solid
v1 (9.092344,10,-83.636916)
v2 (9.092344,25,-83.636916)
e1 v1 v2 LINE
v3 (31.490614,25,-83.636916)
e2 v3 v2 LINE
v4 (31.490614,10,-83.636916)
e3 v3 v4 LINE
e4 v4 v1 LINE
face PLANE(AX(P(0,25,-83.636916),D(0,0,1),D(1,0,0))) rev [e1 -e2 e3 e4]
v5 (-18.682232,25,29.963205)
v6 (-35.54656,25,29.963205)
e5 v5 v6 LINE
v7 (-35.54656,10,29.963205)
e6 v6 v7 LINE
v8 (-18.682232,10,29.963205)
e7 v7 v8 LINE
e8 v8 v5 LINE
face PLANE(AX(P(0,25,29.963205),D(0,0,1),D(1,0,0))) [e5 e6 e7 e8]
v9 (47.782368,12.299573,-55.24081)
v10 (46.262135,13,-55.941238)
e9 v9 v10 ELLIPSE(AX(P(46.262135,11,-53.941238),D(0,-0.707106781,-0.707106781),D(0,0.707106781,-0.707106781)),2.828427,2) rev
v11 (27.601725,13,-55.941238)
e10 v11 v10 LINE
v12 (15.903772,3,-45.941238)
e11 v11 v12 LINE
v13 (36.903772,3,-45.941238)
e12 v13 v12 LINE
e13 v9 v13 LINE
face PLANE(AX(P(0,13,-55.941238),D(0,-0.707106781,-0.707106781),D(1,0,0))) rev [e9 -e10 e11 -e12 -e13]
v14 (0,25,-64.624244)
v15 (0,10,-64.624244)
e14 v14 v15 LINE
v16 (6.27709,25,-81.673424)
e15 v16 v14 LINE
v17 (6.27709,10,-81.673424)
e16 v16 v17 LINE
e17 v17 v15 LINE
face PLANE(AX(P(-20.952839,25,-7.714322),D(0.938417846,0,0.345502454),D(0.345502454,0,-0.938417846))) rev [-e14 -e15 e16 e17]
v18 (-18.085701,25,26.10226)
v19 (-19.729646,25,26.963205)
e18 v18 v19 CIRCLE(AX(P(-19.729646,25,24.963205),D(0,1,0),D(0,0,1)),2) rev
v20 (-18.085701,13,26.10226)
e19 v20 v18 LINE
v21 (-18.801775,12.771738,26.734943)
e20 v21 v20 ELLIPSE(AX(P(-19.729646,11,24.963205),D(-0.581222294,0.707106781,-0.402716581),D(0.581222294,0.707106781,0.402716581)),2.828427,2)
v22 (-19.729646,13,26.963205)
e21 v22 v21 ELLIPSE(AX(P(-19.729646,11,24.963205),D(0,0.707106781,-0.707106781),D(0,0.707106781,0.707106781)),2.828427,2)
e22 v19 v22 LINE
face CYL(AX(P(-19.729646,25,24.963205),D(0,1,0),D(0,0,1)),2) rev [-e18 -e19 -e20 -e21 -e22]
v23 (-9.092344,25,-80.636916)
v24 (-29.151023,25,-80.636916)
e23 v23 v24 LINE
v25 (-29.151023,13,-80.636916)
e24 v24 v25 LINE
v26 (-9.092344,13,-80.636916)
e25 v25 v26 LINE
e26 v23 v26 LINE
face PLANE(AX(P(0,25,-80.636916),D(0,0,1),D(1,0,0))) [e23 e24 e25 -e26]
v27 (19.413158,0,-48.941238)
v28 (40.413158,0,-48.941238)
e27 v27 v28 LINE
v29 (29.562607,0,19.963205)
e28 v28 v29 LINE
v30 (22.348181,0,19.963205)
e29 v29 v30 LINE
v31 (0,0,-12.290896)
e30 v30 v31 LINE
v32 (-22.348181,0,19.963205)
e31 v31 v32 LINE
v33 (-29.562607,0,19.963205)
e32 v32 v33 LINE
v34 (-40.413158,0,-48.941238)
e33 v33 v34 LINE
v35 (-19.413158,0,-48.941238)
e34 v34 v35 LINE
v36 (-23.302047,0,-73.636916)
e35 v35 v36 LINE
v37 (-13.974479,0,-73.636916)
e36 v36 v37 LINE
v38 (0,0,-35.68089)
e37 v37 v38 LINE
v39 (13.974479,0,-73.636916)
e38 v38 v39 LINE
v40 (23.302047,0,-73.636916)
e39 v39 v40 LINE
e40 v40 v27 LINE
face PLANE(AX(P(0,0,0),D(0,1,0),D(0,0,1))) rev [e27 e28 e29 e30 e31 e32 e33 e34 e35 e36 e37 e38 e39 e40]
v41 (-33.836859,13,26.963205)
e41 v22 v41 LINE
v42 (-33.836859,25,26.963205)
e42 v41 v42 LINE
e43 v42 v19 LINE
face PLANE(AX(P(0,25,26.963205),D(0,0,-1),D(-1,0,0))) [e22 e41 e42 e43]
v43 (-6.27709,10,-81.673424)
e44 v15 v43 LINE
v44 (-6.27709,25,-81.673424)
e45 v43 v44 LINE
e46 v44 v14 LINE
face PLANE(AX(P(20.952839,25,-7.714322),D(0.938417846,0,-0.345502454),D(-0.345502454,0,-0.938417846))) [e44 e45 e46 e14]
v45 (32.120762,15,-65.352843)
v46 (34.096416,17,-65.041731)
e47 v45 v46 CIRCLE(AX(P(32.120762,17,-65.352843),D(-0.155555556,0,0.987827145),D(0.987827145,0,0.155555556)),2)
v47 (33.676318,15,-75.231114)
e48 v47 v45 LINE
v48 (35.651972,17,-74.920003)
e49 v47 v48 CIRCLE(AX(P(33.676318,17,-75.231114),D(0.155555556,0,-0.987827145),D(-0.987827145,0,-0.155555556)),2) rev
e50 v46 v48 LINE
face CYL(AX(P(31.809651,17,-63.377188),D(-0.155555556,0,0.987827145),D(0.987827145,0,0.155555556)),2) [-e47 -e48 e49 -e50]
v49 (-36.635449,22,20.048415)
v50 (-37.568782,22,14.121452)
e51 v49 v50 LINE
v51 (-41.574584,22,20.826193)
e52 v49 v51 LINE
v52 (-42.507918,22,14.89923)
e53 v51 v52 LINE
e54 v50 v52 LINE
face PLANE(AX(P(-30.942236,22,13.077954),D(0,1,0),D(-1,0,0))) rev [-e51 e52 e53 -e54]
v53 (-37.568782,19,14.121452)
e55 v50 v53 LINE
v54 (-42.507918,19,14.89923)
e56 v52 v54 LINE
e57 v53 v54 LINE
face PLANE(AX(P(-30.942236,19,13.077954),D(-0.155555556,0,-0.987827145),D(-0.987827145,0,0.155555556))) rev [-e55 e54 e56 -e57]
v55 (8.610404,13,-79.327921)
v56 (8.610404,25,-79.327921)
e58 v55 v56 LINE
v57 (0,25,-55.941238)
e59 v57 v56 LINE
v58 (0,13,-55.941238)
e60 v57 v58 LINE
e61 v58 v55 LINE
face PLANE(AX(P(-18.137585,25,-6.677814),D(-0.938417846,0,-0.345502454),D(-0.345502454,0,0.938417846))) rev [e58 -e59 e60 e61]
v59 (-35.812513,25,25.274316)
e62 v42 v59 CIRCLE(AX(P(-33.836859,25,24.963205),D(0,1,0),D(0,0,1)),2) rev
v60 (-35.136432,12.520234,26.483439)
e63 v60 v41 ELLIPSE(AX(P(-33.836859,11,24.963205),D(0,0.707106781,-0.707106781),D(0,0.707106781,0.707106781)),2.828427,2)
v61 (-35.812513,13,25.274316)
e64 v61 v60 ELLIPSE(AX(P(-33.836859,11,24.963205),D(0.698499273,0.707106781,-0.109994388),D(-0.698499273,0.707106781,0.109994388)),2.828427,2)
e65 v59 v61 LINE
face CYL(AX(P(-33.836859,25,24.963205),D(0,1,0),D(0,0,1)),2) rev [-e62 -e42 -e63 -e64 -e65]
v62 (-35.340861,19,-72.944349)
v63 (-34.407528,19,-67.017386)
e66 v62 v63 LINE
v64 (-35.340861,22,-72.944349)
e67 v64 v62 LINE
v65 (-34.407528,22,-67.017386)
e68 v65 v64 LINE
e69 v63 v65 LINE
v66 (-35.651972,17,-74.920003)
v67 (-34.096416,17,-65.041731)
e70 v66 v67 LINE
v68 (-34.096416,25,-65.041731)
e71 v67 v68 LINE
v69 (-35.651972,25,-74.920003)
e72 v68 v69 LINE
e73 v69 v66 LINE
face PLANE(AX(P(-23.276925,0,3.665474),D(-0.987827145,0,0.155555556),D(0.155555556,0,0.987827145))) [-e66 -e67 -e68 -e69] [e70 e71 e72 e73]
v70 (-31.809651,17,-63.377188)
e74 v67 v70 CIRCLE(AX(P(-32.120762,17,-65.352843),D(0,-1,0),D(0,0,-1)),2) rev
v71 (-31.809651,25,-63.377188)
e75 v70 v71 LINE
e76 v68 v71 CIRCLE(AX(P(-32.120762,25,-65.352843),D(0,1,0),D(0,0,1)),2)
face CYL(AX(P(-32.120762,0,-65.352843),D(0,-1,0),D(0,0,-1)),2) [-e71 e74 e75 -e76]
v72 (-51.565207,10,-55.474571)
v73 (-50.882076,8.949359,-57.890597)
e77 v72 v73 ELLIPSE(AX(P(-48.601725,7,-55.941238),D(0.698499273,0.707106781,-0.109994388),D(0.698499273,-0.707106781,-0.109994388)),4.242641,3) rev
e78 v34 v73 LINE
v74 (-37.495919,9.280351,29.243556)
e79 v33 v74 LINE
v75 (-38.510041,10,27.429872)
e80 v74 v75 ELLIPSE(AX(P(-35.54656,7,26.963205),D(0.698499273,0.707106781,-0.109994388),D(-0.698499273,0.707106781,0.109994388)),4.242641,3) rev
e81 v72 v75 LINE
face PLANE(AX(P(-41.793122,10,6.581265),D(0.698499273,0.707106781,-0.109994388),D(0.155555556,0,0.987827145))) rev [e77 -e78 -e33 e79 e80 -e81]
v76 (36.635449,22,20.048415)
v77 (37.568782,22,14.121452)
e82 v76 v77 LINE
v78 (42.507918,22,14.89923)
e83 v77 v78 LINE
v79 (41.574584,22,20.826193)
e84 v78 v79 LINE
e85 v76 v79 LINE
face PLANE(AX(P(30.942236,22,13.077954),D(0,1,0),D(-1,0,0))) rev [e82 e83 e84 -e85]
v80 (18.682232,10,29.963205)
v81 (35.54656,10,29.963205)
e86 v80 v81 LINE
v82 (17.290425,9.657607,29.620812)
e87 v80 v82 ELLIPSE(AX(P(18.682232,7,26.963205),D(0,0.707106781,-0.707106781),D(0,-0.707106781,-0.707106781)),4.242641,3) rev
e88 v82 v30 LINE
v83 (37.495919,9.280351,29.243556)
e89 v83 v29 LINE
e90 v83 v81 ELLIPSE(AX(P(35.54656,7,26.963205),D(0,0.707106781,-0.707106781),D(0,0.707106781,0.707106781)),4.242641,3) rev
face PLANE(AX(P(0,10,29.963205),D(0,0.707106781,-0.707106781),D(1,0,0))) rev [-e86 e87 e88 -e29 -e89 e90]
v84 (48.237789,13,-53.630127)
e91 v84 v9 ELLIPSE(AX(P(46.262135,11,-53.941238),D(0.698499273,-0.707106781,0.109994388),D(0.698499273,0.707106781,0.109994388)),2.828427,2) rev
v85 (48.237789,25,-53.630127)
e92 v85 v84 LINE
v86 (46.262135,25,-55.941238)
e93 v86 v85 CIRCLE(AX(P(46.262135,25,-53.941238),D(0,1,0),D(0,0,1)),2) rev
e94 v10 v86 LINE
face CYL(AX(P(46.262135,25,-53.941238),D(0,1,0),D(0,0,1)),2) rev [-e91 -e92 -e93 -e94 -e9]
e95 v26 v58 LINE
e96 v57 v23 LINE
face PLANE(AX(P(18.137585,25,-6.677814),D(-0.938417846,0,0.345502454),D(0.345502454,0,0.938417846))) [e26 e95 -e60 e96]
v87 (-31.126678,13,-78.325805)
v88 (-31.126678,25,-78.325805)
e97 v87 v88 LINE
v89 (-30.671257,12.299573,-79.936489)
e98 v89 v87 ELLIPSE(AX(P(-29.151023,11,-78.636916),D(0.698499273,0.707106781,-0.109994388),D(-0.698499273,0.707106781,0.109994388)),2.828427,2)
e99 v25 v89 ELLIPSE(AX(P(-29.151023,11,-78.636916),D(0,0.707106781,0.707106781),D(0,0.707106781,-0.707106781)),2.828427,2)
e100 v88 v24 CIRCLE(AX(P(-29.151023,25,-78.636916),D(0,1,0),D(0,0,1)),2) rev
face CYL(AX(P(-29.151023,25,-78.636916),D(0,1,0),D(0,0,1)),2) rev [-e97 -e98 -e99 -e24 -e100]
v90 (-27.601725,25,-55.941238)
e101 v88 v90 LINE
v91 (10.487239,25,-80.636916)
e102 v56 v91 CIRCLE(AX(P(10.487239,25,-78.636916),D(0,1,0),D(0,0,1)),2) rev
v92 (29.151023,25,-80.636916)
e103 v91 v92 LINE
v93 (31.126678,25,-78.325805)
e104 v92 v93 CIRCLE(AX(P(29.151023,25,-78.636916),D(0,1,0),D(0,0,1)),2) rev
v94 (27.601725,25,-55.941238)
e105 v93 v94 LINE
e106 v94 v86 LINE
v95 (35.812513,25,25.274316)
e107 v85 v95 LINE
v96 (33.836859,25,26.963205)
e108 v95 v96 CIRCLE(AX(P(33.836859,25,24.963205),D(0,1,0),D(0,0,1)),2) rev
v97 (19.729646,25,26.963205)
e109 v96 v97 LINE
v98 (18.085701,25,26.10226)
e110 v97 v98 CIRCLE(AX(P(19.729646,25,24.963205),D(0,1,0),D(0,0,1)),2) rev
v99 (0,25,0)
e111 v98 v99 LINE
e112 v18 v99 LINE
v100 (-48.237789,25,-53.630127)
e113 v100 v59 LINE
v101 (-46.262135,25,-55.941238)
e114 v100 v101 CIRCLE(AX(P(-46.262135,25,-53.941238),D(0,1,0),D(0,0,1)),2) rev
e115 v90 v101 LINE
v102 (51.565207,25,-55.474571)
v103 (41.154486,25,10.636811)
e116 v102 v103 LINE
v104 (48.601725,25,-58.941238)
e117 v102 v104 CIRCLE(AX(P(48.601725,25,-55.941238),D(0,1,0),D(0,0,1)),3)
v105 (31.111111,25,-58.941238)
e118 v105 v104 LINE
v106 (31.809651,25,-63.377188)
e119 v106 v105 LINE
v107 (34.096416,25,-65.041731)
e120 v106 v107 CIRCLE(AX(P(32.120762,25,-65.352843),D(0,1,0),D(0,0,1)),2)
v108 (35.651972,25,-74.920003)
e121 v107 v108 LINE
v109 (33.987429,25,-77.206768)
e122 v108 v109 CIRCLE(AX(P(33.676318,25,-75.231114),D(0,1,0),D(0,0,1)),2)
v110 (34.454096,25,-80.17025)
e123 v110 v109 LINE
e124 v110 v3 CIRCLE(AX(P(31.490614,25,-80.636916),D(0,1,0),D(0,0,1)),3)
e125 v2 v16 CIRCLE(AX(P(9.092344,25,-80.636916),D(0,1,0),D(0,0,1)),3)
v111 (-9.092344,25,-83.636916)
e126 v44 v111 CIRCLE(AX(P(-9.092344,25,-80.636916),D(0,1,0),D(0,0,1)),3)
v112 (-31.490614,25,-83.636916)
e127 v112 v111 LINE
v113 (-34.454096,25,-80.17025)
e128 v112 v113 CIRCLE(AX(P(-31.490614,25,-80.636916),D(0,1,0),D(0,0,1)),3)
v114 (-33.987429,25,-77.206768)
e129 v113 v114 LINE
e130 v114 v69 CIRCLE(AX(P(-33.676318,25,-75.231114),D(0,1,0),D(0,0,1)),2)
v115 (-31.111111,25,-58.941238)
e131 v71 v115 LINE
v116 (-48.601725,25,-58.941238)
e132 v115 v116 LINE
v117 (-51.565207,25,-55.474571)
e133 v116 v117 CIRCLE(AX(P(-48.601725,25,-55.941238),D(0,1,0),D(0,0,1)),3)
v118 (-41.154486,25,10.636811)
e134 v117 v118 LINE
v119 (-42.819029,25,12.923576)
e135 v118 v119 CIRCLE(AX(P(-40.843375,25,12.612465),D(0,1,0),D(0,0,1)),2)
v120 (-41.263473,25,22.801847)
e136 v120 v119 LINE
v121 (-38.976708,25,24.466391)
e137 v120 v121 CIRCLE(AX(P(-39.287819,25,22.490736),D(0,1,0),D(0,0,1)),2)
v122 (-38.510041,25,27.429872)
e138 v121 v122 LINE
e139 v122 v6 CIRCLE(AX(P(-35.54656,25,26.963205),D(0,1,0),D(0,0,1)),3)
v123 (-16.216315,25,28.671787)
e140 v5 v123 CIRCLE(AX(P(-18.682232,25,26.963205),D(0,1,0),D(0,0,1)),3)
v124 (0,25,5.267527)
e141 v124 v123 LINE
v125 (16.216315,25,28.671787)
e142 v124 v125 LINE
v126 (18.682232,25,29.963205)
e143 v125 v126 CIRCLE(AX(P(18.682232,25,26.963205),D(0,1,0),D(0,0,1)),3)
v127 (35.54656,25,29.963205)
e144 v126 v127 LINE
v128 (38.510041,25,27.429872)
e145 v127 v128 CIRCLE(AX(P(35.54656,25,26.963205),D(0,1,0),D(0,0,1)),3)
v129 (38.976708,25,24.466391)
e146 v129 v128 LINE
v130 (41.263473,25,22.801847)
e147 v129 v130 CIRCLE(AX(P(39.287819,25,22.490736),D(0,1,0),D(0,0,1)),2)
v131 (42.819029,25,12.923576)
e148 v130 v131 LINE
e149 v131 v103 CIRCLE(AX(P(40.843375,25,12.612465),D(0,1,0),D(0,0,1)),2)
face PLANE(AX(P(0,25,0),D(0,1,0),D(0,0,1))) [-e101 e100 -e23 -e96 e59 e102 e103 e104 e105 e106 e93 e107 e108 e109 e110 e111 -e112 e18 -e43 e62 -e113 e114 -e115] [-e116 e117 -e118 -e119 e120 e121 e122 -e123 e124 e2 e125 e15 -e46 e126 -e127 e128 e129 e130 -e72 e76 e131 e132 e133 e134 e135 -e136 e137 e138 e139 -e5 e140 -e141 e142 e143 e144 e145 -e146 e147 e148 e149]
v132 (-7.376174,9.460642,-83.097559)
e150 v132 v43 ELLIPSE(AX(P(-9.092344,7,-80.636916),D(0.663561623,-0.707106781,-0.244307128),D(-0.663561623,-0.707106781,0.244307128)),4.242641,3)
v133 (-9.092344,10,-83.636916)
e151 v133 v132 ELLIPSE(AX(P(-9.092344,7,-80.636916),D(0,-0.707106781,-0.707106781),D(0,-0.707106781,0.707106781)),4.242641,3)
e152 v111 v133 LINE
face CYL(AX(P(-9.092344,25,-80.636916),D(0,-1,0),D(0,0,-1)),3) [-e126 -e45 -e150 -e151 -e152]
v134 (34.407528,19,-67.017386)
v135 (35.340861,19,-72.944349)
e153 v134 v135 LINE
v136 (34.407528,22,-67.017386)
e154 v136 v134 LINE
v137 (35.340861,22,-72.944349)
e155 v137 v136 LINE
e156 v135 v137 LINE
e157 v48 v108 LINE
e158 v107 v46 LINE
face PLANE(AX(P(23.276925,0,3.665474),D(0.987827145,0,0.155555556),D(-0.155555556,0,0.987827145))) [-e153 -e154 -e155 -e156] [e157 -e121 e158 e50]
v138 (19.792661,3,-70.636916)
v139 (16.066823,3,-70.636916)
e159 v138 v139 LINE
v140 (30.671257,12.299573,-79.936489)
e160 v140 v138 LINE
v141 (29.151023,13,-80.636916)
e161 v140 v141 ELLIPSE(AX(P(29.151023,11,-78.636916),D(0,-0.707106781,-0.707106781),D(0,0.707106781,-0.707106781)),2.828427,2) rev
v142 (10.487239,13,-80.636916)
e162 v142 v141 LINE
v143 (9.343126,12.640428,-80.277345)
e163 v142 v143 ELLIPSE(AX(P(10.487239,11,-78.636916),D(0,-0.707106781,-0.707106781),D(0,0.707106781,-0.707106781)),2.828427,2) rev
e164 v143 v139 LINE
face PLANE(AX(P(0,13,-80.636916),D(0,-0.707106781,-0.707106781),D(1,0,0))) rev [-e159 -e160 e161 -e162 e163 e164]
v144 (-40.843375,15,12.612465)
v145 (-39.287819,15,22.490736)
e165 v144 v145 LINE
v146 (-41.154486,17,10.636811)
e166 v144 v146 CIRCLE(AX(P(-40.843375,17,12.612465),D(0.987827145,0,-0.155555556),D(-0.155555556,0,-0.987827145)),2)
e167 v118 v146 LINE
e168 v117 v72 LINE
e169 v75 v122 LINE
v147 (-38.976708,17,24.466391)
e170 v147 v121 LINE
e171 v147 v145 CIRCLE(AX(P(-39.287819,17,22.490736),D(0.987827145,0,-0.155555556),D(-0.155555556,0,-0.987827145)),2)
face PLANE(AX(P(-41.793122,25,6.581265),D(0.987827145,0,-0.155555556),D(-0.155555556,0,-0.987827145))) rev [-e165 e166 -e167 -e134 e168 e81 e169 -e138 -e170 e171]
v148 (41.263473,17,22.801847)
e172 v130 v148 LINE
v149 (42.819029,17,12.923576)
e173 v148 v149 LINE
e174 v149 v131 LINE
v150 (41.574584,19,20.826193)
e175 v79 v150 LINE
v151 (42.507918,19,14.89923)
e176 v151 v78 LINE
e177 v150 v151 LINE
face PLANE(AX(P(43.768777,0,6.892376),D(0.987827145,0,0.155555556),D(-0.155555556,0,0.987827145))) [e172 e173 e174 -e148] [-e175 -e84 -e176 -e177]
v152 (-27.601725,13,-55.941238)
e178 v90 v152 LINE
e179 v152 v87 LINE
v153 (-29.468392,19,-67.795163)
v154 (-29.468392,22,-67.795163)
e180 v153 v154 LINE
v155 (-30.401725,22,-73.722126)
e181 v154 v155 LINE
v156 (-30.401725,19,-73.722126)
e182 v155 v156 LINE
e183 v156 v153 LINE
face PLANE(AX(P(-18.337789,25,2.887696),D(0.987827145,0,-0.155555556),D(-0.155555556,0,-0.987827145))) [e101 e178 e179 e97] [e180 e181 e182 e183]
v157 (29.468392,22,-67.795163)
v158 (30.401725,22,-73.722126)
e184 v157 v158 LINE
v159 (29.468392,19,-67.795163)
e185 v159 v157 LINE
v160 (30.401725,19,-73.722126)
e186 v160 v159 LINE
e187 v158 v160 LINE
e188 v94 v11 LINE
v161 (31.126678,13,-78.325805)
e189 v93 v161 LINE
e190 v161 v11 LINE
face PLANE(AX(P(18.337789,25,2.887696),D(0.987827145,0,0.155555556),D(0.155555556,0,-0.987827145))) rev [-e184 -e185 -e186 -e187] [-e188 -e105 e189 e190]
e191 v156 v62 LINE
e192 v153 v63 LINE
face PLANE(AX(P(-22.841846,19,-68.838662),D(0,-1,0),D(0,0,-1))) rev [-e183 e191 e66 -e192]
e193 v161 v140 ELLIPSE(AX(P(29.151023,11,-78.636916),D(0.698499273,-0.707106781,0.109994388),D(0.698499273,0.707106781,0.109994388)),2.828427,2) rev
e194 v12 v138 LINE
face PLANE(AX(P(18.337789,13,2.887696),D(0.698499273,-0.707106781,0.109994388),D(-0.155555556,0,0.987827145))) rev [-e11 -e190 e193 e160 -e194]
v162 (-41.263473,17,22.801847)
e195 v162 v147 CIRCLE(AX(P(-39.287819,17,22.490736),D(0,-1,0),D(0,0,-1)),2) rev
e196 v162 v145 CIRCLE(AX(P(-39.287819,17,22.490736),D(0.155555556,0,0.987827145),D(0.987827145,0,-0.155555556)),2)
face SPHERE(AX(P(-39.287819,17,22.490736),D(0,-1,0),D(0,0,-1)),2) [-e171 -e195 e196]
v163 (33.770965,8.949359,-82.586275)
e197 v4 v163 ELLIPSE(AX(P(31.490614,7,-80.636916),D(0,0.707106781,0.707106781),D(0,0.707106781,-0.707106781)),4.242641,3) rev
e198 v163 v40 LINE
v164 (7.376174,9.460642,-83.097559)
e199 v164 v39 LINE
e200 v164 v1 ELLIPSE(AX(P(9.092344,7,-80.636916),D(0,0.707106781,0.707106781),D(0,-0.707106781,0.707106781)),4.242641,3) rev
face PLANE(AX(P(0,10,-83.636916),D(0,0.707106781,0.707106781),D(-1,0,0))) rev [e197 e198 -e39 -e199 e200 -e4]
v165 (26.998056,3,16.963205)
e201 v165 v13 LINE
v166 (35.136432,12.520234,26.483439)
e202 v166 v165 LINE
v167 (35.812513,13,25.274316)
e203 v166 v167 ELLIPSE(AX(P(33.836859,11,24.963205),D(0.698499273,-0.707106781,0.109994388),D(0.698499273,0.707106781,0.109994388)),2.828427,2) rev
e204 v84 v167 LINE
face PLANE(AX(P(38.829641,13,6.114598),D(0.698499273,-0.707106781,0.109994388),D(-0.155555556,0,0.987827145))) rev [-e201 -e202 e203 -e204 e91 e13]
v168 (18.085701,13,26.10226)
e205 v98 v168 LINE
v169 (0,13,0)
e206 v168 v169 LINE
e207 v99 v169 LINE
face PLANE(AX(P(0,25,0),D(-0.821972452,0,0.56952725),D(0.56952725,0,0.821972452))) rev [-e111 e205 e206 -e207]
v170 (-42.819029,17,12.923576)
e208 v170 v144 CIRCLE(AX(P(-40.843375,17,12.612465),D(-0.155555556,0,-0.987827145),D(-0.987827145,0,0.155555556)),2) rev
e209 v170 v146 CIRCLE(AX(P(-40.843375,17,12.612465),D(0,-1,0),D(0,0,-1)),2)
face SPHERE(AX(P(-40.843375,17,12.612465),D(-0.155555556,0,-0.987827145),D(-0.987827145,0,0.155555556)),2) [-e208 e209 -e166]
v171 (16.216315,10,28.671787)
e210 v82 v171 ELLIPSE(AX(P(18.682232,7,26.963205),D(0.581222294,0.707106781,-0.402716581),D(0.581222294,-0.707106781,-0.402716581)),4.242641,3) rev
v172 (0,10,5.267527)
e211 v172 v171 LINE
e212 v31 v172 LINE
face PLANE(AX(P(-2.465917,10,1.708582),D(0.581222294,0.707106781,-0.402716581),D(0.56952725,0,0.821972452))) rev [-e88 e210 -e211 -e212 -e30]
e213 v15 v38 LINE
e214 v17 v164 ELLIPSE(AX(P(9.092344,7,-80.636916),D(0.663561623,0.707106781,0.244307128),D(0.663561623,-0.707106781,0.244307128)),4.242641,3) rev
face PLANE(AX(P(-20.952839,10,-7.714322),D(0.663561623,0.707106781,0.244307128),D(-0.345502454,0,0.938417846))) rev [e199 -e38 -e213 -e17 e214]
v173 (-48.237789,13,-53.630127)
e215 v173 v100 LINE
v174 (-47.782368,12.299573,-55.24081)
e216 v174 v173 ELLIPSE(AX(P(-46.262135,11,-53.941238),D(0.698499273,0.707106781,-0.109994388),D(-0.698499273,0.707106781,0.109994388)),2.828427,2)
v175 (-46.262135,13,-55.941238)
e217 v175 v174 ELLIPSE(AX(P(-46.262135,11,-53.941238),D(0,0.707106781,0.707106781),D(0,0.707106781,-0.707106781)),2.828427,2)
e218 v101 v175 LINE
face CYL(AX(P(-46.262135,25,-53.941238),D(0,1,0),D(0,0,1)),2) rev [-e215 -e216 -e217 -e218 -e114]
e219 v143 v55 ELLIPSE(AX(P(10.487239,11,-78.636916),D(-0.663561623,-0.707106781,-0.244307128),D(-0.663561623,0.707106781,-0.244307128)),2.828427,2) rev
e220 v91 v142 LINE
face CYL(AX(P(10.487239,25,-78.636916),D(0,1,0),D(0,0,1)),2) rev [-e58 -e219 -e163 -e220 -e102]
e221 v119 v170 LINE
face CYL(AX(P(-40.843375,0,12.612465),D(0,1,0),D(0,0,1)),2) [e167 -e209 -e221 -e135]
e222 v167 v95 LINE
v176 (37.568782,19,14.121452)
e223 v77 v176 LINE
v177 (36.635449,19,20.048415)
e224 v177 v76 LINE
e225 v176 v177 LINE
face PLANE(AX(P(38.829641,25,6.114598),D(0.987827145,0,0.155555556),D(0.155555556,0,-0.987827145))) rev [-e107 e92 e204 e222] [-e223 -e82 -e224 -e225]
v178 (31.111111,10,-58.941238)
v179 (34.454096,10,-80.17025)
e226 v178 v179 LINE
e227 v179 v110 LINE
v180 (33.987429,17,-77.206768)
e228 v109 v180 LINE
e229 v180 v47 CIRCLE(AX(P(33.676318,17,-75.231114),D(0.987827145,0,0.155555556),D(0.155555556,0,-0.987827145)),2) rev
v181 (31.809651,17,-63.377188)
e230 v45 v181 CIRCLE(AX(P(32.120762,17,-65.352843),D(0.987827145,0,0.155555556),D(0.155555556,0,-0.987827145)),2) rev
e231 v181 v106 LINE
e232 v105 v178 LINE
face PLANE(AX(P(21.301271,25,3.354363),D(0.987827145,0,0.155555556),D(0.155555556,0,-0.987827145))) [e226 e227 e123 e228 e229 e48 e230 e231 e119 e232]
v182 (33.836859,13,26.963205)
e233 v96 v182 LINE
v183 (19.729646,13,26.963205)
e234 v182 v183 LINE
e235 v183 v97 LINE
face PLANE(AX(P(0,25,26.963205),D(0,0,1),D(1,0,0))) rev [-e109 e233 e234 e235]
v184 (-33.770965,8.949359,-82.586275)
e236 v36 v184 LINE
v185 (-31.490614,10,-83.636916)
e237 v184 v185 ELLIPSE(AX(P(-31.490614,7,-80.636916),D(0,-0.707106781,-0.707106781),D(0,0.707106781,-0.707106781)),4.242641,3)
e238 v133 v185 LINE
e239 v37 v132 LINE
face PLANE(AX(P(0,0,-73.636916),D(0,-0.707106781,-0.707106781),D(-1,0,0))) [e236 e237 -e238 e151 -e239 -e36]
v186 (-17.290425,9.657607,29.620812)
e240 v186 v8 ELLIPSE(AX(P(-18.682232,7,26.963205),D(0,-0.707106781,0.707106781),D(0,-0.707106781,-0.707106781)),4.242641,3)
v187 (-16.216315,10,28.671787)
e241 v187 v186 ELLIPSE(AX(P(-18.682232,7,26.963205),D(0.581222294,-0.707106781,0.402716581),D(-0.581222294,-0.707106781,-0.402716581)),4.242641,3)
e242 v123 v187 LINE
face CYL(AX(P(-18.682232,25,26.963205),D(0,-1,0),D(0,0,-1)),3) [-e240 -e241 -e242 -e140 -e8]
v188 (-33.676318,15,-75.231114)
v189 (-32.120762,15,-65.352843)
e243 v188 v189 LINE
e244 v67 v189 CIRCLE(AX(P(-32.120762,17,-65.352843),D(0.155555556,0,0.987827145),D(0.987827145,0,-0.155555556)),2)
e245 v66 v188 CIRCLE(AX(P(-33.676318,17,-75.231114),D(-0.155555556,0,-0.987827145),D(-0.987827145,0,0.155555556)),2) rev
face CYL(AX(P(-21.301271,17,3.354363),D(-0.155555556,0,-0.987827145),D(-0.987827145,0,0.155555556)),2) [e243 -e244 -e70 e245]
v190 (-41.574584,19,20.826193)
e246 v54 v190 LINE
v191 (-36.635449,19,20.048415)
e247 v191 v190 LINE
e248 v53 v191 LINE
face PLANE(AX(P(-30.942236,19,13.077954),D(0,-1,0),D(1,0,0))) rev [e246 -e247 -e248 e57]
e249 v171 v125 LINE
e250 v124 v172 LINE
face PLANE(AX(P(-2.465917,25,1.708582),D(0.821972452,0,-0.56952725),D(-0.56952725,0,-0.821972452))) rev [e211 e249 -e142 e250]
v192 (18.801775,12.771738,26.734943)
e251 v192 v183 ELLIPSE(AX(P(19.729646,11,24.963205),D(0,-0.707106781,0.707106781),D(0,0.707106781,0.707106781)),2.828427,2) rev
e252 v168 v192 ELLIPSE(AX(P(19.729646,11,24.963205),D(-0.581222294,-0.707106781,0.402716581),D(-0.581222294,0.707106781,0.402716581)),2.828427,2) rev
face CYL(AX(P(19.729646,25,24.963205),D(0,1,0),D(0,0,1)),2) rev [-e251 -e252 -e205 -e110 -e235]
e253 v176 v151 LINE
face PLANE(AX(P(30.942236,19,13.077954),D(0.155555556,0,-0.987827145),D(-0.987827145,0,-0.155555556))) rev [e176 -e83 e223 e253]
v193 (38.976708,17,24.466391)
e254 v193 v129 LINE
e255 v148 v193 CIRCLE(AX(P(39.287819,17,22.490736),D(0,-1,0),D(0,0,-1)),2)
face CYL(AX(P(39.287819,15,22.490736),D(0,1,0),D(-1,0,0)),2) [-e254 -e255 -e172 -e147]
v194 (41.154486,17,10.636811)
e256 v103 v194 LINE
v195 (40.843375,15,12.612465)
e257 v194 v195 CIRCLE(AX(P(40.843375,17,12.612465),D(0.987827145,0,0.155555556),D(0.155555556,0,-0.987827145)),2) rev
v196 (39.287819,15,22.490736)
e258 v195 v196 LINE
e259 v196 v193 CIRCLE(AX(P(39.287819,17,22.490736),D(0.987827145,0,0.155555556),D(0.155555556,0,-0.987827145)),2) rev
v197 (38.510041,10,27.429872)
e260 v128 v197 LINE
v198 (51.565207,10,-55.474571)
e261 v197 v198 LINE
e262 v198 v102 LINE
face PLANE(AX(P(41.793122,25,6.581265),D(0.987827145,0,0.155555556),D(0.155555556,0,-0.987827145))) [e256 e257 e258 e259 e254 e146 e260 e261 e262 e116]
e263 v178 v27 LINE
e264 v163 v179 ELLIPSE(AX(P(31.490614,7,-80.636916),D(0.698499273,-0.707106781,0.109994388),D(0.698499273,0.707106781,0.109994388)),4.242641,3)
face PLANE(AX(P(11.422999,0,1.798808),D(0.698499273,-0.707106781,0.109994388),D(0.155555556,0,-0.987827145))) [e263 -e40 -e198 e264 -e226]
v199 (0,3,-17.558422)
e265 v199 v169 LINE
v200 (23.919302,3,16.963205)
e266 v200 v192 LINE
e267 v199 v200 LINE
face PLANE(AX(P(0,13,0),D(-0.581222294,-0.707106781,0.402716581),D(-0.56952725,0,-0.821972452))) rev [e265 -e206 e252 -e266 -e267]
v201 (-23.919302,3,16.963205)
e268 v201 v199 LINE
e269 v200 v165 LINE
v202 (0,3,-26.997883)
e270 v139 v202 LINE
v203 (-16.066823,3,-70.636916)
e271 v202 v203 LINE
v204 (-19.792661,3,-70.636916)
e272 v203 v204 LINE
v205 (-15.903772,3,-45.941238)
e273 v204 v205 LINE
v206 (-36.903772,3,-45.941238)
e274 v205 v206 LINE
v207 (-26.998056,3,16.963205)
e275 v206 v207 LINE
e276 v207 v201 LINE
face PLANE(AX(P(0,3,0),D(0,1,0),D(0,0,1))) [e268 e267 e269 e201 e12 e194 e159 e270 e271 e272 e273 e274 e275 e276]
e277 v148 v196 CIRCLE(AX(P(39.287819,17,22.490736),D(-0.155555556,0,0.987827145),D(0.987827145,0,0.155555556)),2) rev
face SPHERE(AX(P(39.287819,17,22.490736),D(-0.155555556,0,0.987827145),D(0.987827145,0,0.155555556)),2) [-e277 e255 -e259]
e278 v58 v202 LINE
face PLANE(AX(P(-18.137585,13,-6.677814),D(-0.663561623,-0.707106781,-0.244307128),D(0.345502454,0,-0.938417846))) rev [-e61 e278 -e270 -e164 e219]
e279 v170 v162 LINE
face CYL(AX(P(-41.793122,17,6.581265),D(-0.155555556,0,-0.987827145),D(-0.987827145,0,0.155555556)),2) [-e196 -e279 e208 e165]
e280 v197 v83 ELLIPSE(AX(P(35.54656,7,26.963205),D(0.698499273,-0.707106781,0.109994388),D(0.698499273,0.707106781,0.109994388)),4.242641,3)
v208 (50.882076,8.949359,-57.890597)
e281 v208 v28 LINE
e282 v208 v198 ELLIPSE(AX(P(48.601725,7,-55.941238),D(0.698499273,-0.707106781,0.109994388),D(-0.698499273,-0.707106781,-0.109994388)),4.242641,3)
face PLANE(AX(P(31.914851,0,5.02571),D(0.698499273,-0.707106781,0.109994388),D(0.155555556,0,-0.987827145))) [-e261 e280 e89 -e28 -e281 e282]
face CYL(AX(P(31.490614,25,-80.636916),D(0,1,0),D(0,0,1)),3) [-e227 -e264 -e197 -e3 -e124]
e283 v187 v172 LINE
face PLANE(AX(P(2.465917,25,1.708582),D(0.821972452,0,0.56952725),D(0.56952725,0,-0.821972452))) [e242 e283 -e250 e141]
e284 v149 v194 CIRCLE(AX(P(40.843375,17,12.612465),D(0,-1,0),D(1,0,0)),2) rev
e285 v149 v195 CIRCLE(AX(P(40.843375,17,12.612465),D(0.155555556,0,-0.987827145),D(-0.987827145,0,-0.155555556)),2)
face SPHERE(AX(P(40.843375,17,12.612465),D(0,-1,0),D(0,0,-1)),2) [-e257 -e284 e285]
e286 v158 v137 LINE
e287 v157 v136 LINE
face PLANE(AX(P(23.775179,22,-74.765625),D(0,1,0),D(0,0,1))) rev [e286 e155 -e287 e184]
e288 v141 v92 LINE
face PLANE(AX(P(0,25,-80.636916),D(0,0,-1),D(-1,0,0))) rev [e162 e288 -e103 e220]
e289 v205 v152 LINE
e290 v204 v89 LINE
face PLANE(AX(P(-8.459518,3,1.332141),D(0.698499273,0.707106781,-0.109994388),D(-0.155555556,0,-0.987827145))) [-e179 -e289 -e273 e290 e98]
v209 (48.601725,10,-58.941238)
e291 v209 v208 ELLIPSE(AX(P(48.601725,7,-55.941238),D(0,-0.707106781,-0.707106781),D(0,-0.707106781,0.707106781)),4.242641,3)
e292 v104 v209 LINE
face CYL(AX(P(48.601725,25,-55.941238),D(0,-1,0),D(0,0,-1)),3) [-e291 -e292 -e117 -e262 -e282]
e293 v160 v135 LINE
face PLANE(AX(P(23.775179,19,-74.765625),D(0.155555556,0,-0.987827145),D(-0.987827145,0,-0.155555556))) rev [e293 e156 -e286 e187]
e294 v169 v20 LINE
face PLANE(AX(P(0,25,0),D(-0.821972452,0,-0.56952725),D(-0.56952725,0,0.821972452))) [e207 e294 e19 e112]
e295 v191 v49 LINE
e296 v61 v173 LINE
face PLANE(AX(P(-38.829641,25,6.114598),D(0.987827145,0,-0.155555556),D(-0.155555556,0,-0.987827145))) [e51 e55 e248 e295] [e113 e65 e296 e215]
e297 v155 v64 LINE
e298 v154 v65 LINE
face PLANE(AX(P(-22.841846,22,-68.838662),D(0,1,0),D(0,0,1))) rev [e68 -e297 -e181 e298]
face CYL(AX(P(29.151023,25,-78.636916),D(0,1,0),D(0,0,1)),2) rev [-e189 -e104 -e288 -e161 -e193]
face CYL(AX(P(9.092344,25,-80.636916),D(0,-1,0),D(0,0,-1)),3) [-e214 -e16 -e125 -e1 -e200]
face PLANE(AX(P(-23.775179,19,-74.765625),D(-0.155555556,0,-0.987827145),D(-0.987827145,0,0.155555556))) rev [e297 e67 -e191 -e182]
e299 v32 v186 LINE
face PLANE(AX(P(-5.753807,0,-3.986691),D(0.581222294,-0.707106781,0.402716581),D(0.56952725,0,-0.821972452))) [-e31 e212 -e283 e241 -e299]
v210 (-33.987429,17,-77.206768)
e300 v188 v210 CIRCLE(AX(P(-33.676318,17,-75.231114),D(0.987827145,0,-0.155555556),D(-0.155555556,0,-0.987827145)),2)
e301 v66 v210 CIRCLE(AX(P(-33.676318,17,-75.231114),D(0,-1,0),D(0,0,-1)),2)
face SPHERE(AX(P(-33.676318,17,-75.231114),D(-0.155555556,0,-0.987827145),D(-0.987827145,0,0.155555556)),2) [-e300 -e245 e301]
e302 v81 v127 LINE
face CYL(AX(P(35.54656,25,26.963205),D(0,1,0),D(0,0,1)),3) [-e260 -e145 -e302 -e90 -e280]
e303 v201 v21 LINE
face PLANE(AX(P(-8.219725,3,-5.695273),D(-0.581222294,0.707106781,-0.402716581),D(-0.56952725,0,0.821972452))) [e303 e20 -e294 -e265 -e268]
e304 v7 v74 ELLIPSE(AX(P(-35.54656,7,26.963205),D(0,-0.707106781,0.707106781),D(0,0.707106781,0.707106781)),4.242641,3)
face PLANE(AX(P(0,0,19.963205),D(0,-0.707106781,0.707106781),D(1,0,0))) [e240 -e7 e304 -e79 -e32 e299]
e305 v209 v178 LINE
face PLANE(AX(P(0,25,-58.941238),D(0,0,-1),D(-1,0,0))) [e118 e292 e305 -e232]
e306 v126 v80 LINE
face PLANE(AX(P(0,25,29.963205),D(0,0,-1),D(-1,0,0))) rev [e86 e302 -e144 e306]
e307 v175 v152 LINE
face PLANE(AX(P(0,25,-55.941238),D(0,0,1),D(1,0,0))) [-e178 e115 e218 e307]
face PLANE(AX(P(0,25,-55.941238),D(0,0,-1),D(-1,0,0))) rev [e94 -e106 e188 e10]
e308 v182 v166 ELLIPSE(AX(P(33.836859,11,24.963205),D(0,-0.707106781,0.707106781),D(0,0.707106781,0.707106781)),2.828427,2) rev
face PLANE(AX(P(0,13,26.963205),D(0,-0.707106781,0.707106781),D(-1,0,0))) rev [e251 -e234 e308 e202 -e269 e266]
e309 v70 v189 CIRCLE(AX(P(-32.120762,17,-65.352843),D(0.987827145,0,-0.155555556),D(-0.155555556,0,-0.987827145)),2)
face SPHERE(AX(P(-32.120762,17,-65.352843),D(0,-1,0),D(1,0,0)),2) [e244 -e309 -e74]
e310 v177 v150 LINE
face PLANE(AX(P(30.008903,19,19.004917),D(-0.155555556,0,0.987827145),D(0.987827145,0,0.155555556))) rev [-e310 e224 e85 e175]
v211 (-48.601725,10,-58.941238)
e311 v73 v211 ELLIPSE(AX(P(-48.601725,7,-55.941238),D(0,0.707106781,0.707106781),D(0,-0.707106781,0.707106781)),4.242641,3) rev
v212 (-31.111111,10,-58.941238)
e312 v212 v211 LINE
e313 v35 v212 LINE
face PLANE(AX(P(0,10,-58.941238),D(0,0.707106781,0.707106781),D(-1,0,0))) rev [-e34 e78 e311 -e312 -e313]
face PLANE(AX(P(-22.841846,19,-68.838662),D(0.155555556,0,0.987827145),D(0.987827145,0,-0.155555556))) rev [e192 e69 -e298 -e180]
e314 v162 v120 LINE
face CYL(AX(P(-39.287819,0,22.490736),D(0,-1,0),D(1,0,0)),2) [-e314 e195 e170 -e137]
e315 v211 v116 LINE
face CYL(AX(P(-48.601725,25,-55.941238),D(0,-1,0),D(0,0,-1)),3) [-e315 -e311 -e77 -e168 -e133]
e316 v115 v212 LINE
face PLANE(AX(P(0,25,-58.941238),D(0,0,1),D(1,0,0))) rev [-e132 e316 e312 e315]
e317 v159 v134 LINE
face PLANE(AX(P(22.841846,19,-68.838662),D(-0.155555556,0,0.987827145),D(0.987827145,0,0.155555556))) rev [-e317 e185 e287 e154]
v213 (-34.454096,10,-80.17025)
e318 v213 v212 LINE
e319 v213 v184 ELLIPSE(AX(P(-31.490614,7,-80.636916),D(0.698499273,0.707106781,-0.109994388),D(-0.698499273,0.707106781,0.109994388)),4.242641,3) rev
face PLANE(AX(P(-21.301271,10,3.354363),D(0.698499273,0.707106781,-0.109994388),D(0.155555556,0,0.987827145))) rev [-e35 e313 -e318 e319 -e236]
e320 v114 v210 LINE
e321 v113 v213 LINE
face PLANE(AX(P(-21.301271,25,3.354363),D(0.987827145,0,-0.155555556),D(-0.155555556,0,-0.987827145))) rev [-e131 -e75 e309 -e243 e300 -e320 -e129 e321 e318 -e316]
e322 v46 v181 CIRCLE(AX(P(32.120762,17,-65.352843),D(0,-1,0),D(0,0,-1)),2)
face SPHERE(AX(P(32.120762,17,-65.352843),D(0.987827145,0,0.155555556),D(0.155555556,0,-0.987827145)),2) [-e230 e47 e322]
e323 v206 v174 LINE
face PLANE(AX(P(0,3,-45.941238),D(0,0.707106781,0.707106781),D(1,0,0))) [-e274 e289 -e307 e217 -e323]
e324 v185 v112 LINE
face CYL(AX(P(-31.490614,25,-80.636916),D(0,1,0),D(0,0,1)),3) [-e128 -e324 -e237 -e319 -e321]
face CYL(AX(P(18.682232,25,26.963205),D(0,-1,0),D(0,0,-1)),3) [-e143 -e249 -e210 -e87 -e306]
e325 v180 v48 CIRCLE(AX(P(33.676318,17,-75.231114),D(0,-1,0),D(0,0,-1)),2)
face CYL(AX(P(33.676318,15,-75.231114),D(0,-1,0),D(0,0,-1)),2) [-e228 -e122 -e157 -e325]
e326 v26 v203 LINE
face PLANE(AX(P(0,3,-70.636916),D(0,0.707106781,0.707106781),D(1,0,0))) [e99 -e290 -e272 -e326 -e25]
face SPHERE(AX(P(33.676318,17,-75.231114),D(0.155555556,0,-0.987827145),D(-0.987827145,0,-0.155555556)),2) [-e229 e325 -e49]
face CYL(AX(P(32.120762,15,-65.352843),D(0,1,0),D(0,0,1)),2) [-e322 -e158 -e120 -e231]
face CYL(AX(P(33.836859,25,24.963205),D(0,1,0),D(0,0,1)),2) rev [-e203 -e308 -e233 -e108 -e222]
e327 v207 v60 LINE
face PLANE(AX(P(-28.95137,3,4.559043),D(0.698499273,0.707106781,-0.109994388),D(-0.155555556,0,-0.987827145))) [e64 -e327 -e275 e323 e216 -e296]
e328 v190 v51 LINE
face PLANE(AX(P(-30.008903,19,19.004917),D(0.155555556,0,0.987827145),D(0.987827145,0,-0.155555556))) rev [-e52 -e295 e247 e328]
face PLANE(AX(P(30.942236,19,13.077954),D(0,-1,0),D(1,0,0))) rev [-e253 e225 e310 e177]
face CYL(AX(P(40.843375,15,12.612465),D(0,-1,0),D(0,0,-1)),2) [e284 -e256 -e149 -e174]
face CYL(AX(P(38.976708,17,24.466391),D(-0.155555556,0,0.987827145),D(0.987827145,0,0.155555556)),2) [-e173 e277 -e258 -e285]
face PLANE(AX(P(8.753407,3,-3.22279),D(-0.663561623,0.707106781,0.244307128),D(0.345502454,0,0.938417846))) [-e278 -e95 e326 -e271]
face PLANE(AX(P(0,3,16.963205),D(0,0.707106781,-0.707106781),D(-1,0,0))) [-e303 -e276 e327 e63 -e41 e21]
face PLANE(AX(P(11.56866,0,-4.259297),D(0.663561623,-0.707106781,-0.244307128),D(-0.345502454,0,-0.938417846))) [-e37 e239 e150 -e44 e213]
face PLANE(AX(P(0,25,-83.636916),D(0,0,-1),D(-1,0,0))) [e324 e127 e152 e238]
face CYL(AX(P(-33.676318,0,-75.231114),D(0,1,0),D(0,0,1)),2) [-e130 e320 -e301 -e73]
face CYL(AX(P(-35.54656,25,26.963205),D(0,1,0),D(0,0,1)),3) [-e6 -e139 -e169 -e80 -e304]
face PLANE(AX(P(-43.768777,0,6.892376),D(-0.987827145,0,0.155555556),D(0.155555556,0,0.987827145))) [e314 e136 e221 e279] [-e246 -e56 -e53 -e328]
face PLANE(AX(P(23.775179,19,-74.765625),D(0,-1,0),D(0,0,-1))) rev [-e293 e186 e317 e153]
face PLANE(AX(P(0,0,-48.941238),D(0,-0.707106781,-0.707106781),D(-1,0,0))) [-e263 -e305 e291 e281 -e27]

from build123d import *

# Parameters (mm, degrees)
BOSS_EXTRUDE2_DEPTH = 25
BOSS_EXTRUDE5_DEPTH = 3
CHAMFER2_SIZE       = 10
FILLET4_R           = 3
FILLET5_R           = 2
SKETCH5_W           = 14
SKETCH5_H           = 10
BOSS_EXTRUDE6_DEPTH = 2
SKETCH6_W           = 6
SKETCH6_H           = 3
CUT_EXTRUDE5_DEPTH  = 5
SKETCH7_W           = 14
SKETCH7_H           = 10
BOSS_EXTRUDE7_DEPTH = 2
SKETCH8_W           = 6
SKETCH8_H           = 3
CUT_EXTRUDE6_DEPTH  = 5
SKETCH9_W           = 6
SKETCH9_H           = 3
CUT_EXTRUDE7_DEPTH  = 5
SKETCH10_W          = 6
SKETCH10_H          = 3
CUT_EXTRUDE8_DEPTH  = 5
FILLET7_R           = 2


with BuildPart() as part:
    # Sketch1 → Boss-Extrude2 (new body)
    with BuildSketch(Plane(origin=(0, 0, 0), x_dir=(1, 0, 0), z_dir=(0, 1, 0))):
        Polygon((-35, 83.63691638), (-7, 83.63691638), (0, 64.624244097), (7, 83.63691638), (35, 83.63691638), (31.111111111, 58.941237745), (52.111111111, 58.941237745), (38.111111111, -29.963205338), (17.111111111, -29.963205338), (0, -5.267526704), (-17.111111111, -29.963205338), (-38.111111111, -29.963205338), (-52.111111111, 58.941237745), (-31.111111111, 58.941237745), align=None)
        Polygon((-48.6017252, 55.941237745), (-35.546559868, -26.963205338), (-18.682232195, -26.963205338), (0, 0), (18.682232195, -26.963205338), (35.546559868, -26.963205338), (48.6017252, 55.941237745), (27.6017252, 55.941237745), (31.490614089, 80.63691638), (9.092343668, 80.63691638), (0, 55.941237745), (-9.092343668, 80.63691638), (-31.490614089, 80.63691638), (-27.6017252, 55.941237745), align=None, mode=Mode.SUBTRACT)
    extrude(amount=BOSS_EXTRUDE2_DEPTH)

    # Sketch1<7> → Boss-Extrude5 (add)
    with BuildSketch(Plane(origin=(0, 0, 0), x_dir=(1, 0, 0), z_dir=(0, 1, 0))):
        Polygon((0, 55.941237745), (9.092343668, 80.63691638), (31.490614089, 80.63691638), (27.6017252, 55.941237745), (48.6017252, 55.941237745), (35.546559868, -26.963205338), (18.682232195, -26.963205338), (0, 0), (-18.682232195, -26.963205338), (-35.546559868, -26.963205338), (-48.6017252, 55.941237745), (-27.6017252, 55.941237745), (-31.490614089, 80.63691638), (-9.092343668, 80.63691638), align=None)
    extrude(amount=BOSS_EXTRUDE5_DEPTH)

    # Chamfer2
    chamfer2_edges = [part.edges().sort_by_distance(p)[0] for p in [
        (9.341116097, 3, 13.481602669),
        (27.114396032, 3, 26.963205338),
        (42.074142534, 3, -14.489016203),
        (38.1017252, 3, -55.941237745),
        (29.546169644, 3, -68.289077062),
        (20.291478878, 3, -80.63691638),
        (-4.546171834, 3, -68.289077062),
        (-20.291478878, 3, -80.63691638),
        (-29.546169644, 3, -68.289077062),
        (-38.1017252, 3, -55.941237745),
        (-42.074142534, 3, -14.489016203),
        (-27.114396032, 3, 26.963205338),
        (-9.341116097, 3, 13.481602669),
        (-27.611111111, 0, 29.963205338),
        (-45.111111111, 0, -14.489016203),
        (-41.611111111, 0, -58.941237745),
        (-33.055555556, 0, -71.289077062),
        (-21, 0, -83.63691638),
        (-3.5, 0, -74.130580238),
        (3.5, 0, -74.130580238),
        (21, 0, -83.63691638),
        (33.055555556, 0, -71.289077062),
        (41.611111111, 0, -58.941237745),
        (45.111111111, 0, -14.489016203),
        (27.611111111, 0, 29.963205338),
        (8.555555556, 0, 17.615366021),
        (-8.555555556, 0, 17.615366021),
        (4.546171834, 3, -68.289077062),
    ]]
    chamfer(chamfer2_edges, length=CHAMFER2_SIZE)

    # Fillet4
    fillet4_edges = [part.edges().sort_by_distance(p)[0] for p in [
        (-17.111111111, 17.5, 29.963205338),
        (-38.111111111, 17.5, 29.963205338),
        (-52.111111111, 17.5, -58.941237745),
        (-35, 17.5, -83.63691638),
        (-7, 17.5, -83.63691638),
        (7, 17.5, -83.63691638),
        (35, 17.5, -83.63691638),
        (52.111111111, 17.5, -58.941237745),
        (38.111111111, 17.5, 29.963205338),
        (17.111111111, 17.5, 29.963205338),
    ]]
    fillet(fillet4_edges, radius=FILLET4_R)

    # Fillet5
    fillet5_edges = [part.edges().sort_by_distance(p)[0] for p in [
        (-31.490614089, 19, -80.63691638),
        (-48.6017252, 19, -55.941237745),
        (-35.546559868, 19, 26.963205338),
        (-18.682232195, 19, 26.963205338),
        (18.682232195, 19, 26.963205338),
        (35.546559868, 19, 26.963205338),
        (48.6017252, 19, -55.941237745),
        (31.490614089, 19, -80.63691638),
        (9.092343668, 19, -80.63691638),
    ]]
    fillet(fillet5_edges, radius=FILLET5_R)

    # Sketch5 → Boss-Extrude6 (add)
    with BuildSketch(Plane(origin=(-21.301270542, 0, 3.354363148), x_dir=(0.15555555555555572, 0, 0.9878271453730164), z_dir=(-0.9878271453730165, 0, 0.15555555555555575))):
        with Locations((-74.553874888, 20)):
            Rectangle(SKETCH5_W, SKETCH5_H)
    boss_extrude6 = extrude(amount=BOSS_EXTRUDE6_DEPTH)

    # Sketch6 → Cut-Extrude5 (cut)
    with BuildSketch(Plane(origin=(-23.276924833, 0, 3.665474259), x_dir=(0.15555555555555592, 0, 0.9878271453730164), z_dir=(-0.9878271453730163, 0, 0.1555555555555559))):
        with Locations((-74.553874888, 20.5)):
            Rectangle(SKETCH6_W, SKETCH6_H)
    extrude(amount=-CUT_EXTRUDE5_DEPTH, mode=Mode.SUBTRACT)

    # Sketch7 → Boss-Extrude7 (add)
    with BuildSketch(Plane(origin=(-41.793122394, 0, 6.581265156), x_dir=(0.15555555555555553, 0, 0.9878271453730164), z_dir=(-0.9878271453730164, 0, 0.15555555555555553))):
        with Locations((11.105521291, 20)):
            Rectangle(SKETCH7_W, SKETCH7_H)
    boss_extrude7 = extrude(amount=BOSS_EXTRUDE7_DEPTH)

    # Sketch8 → Cut-Extrude6 (cut)
    with BuildSketch(Plane(origin=(-43.768776685, 0, 6.892376268), x_dir=(0.15555555555555564, 0, 0.9878271453730164), z_dir=(-0.9878271453730164, 0, 0.15555555555555564))):
        with Locations((11.105521291, 20.5)):
            Rectangle(SKETCH8_W, SKETCH8_H)
    extrude(amount=-CUT_EXTRUDE6_DEPTH, mode=Mode.SUBTRACT)

    # Mirror1: Boss-Extrude6, Boss-Extrude7 across plane
    add(boss_extrude6.mirror(Plane.ZY))
    add(boss_extrude7.mirror(Plane.ZY))

    # Sketch9 → Cut-Extrude7 (cut)
    with BuildSketch(Plane(origin=(43.768776685, 0, 6.892376268), x_dir=(0.1555555555555552, 0, -0.9878271453730165), z_dir=(0.9878271453730165, 0, 0.1555555555555552))):
        with Locations((-11.105521291, 20.5)):
            Rectangle(SKETCH9_W, SKETCH9_H)
    extrude(amount=-CUT_EXTRUDE7_DEPTH, mode=Mode.SUBTRACT)

    # Sketch10 → Cut-Extrude8 (cut)
    with BuildSketch(Plane(origin=(23.276924833, 0, 3.665474259), x_dir=(0.15555555555555514, 0, -0.9878271453730165), z_dir=(0.9878271453730165, 0, 0.15555555555555514))):
        with Locations((74.553874888, 20.5)):
            Rectangle(SKETCH10_W, SKETCH10_H)
    extrude(amount=-CUT_EXTRUDE8_DEPTH, mode=Mode.SUBTRACT)

    # Fillet7
    # the kernel refuses this fillet: 2 mm, written as the material it takes off along each edge
    with BuildSketch(Plane(origin=(-33.676317747, 17, -75.231113986), x_dir=(-0.15555555555555575, 0, -0.9878271453730165), z_dir=(-0.9878271453730165, 0, 0.15555555555555575))) as fillet7_piece_1_section:
        Polygon((0, 0), (FILLET7_R * 1.02, 0), (FILLET7_R * 1.02, FILLET7_R * 1.02), (0, FILLET7_R * 1.02), align=None)
    fillet7_piece_1 = extrude(amount=FILLET7_R * 1.02, mode=Mode.PRIVATE)
    fillet7_piece_1 = fillet7_piece_1 - Plane(origin=(-33.676317747, 17, -75.231113986), x_dir=(0.10999438818457417, 0.7071067811865475, 0.6984992731334093), z_dir=(-0.9878271453730165, 0, 0.15555555555555575)) * Sphere(FILLET7_R, mode=Mode.PRIVATE)
    add(fillet7_piece_1, mode=Mode.SUBTRACT)
    with BuildSketch(Plane(origin=(-32.120762192, 17, -65.352842532), x_dir=(-0.9878271453730165, 0, 0.15555555555555575), z_dir=(0.15555555555555575, 0, 0.9878271453730165))) as fillet7_piece_2_section:
        Polygon((0, 0), (FILLET7_R * 1.02, 0), (FILLET7_R * 1.02, FILLET7_R * 1.02), (0, FILLET7_R * 1.02), align=None)
    fillet7_piece_2 = extrude(amount=FILLET7_R * 1.02, mode=Mode.PRIVATE)
    fillet7_piece_2 = fillet7_piece_2 - Plane(origin=(-32.120762192, 17, -65.352842532), x_dir=(0.6984992731334094, 0.7071067811865475, -0.10999438818457428), z_dir=(0.15555555555555575, 0, 0.9878271453730165)) * Sphere(FILLET7_R, mode=Mode.PRIVATE)
    add(fillet7_piece_2, mode=Mode.SUBTRACT)
    with BuildSketch(Plane(origin=(-40.843374638, 17, 12.612464824), x_dir=(-0.9878271453730164, 0, 0.15555555555555553), z_dir=(0, -1, 0))) as fillet7_piece_3_section:
        Polygon((0, 0), (FILLET7_R * 1.02, 0), (FILLET7_R * 1.02, FILLET7_R * 1.02), (0, FILLET7_R * 1.02), align=None)
    fillet7_piece_3 = extrude(amount=FILLET7_R * 1.02, mode=Mode.PRIVATE)
    fillet7_piece_3 = fillet7_piece_3 - Plane(origin=(-40.843374638, 17, 12.612464824), x_dir=(0.8084936613179834, 0, 0.5885048849488352), z_dir=(0, -1, 0)) * Sphere(FILLET7_R, mode=Mode.PRIVATE)
    add(fillet7_piece_3, mode=Mode.SUBTRACT)
    with BuildSketch(Plane(origin=(-39.287819082, 17, 22.490736278), x_dir=(0.15555555555555553, 0, 0.9878271453730164), z_dir=(0, -1, 0))) as fillet7_piece_4_section:
        Polygon((0, 0), (FILLET7_R * 1.02, 0), (FILLET7_R * 1.02, FILLET7_R * 1.02), (0, FILLET7_R * 1.02), align=None)
    fillet7_piece_4 = extrude(amount=FILLET7_R * 1.02, mode=Mode.PRIVATE)
    fillet7_piece_4 = fillet7_piece_4 - Plane(origin=(-39.287819082, 17, 22.490736278), x_dir=(0.5885048849488352, 0, -0.8084936613179834), z_dir=(0, -1, 0)) * Sphere(FILLET7_R, mode=Mode.PRIVATE)
    add(fillet7_piece_4, mode=Mode.SUBTRACT)
    with BuildSketch(Plane(origin=(33.676317747, 17, -75.231113986), x_dir=(0.9878271453730165, 0, 0.15555555555555534), z_dir=(0.15555555555555534, 0, -0.9878271453730164))) as fillet7_piece_5_section:
        Polygon((0, 0), (FILLET7_R * 1.02, 0), (FILLET7_R * 1.02, FILLET7_R * 1.02), (0, FILLET7_R * 1.02), align=None)
    fillet7_piece_5 = extrude(amount=FILLET7_R * 1.02, mode=Mode.PRIVATE)
    fillet7_piece_5 = fillet7_piece_5 - Plane(origin=(33.676317747, 17, -75.231113986), x_dir=(-0.6984992731334094, 0.7071067811865475, -0.109994388184574), z_dir=(0.15555555555555534, 0, -0.9878271453730164)) * Sphere(FILLET7_R, mode=Mode.PRIVATE)
    add(fillet7_piece_5, mode=Mode.SUBTRACT)
    with BuildSketch(Plane(origin=(32.120762192, 17, -65.352842532), x_dir=(-0.15555555555555534, 0, 0.9878271453730164), z_dir=(0.9878271453730165, 0, 0.15555555555555534))) as fillet7_piece_6_section:
        Polygon((0, 0), (FILLET7_R * 1.02, 0), (FILLET7_R * 1.02, FILLET7_R * 1.02), (0, FILLET7_R * 1.02), align=None)
    fillet7_piece_6 = extrude(amount=FILLET7_R * 1.02, mode=Mode.PRIVATE)
    fillet7_piece_6 = fillet7_piece_6 - Plane(origin=(32.120762192, 17, -65.352842532), x_dir=(0.10999438818457391, 0.7071067811865475, -0.6984992731334094), z_dir=(0.9878271453730165, 0, 0.15555555555555534)) * Sphere(FILLET7_R, mode=Mode.PRIVATE)
    add(fillet7_piece_6, mode=Mode.SUBTRACT)
    with BuildSketch(Plane(origin=(40.843374638, 17, 12.612464824), x_dir=(0.15555555555555514, 0, -0.9878271453730165), z_dir=(0, -1, 0))) as fillet7_piece_7_section:
        Polygon((0, 0), (FILLET7_R * 1.02, 0), (FILLET7_R * 1.02, FILLET7_R * 1.02), (0, FILLET7_R * 1.02), align=None)
    fillet7_piece_7 = extrude(amount=FILLET7_R * 1.02, mode=Mode.PRIVATE)
    fillet7_piece_7 = fillet7_piece_7 - Plane(origin=(40.843374638, 17, 12.612464824), x_dir=(-0.8084936613179833, 0, 0.5885048849488356), z_dir=(0, -1, 0)) * Sphere(FILLET7_R, mode=Mode.PRIVATE)
    add(fillet7_piece_7, mode=Mode.SUBTRACT)
    with BuildSketch(Plane(origin=(39.287819082, 17, 22.490736278), x_dir=(0, -1, 0), z_dir=(-0.15555555555555514, 0, 0.9878271453730165))) as fillet7_piece_8_section:
        Polygon((0, 0), (FILLET7_R * 1.02, 0), (FILLET7_R * 1.02, FILLET7_R * 1.02), (0, FILLET7_R * 1.02), align=None)
    fillet7_piece_8 = extrude(amount=FILLET7_R * 1.02, mode=Mode.PRIVATE)
    fillet7_piece_8 = fillet7_piece_8 - Plane(origin=(39.287819082, 17, 22.490736278), x_dir=(-0.6984992731334094, 0.7071067811865475, -0.1099943881845739), z_dir=(-0.15555555555555514, 0, 0.9878271453730165)) * Sphere(FILLET7_R, mode=Mode.PRIVATE)
    add(fillet7_piece_8, mode=Mode.SUBTRACT)
    with BuildSketch(Plane(origin=(-35.963083149, 17, -76.895657166), x_dir=(0.15555555555555936, 0, 0.9878271453730157), z_dir=(0, 1, 0)), Plane(origin=(-43.13014004, 17, 10.947921645), x_dir=(0.15555555555555506, 0, 0.9878271453730165), z_dir=(0, 1, 0)), Plane(origin=(35.963083149, 17, -76.895657166), x_dir=(-0.9878271453730183, 0, -0.15555555555554387), z_dir=(0, 1, 0)), Plane(origin=(43.13014004, 17, 10.947921645), x_dir=(-0.9878271453730165, 0, -0.1555555555555548), z_dir=(0, 1, 0))) as fillet7_piece_9:
        with BuildLine():
            CenterArc((FILLET7_R, FILLET7_R), FILLET7_R, 180, 90)
            Line((0, FILLET7_R), (0, 0))
            Line((0, 0), (FILLET7_R, 0))
        make_face()
    extrude(amount=13, mode=Mode.SUBTRACT)
    with BuildSketch(Plane(origin=(-34.096416482, 15, -65.041731421), x_dir=(0, 1, 0), z_dir=(-0.15555555555555575, 0, -0.9878271453730165)), Plane(origin=(-41.263473373, 15, 22.801847389), x_dir=(0, 1, 0), z_dir=(-0.15555555555555553, 0, -0.9878271453730164))) as fillet7_piece_10:
        with BuildLine():
            CenterArc((FILLET7_R, FILLET7_R), FILLET7_R, 180, 90)
            Line((0, FILLET7_R), (0, 0))
            Line((0, 0), (FILLET7_R, 0))
        make_face()
    extrude(amount=10, mode=Mode.SUBTRACT)
    with BuildSketch(Plane(origin=(-33.785305371, 30, -63.06607713), x_dir=(0.9878271453730171, 0, -0.15555555555555162), z_dir=(0, -1, 0)), Plane(origin=(-40.952362262, 30, 24.77750168), x_dir=(0.9878271453730165, 0, -0.1555555555555548), z_dir=(0, -1, 0)), Plane(origin=(33.785305371, 30, -63.06607713), x_dir=(0.1555555555555548, 0, -0.9878271453730165), z_dir=(0, -1, 0)), Plane(origin=(40.952362262, 30, 24.77750168), x_dir=(0.15555555555555506, 0, -0.9878271453730165), z_dir=(0, -1, 0))) as fillet7_piece_11:
        with BuildLine():
            CenterArc((FILLET7_R, -FILLET7_R), FILLET7_R, 90, 90)
            Line((0, -FILLET7_R), (0, 0))
            Line((0, 0), (FILLET7_R, 0))
        make_face()
    extrude(amount=13, mode=Mode.SUBTRACT)
    with BuildSketch(Plane(origin=(34.096416482, 15, -65.041731421), x_dir=(0, 1, 0), z_dir=(0.15555555555555534, 0, -0.9878271453730165)), Plane(origin=(41.263473373, 15, 22.801847389), x_dir=(0, 1, 0), z_dir=(0.1555555555555552, 0, -0.9878271453730165))) as fillet7_piece_12:
        with BuildLine():
            CenterArc((FILLET7_R, -FILLET7_R), FILLET7_R, 90, 90)
            Line((0, -FILLET7_R), (0, 0))
            Line((0, 0), (FILLET7_R, 0))
        make_face()
    extrude(amount=10, mode=Mode.SUBTRACT)


solid = part.part
